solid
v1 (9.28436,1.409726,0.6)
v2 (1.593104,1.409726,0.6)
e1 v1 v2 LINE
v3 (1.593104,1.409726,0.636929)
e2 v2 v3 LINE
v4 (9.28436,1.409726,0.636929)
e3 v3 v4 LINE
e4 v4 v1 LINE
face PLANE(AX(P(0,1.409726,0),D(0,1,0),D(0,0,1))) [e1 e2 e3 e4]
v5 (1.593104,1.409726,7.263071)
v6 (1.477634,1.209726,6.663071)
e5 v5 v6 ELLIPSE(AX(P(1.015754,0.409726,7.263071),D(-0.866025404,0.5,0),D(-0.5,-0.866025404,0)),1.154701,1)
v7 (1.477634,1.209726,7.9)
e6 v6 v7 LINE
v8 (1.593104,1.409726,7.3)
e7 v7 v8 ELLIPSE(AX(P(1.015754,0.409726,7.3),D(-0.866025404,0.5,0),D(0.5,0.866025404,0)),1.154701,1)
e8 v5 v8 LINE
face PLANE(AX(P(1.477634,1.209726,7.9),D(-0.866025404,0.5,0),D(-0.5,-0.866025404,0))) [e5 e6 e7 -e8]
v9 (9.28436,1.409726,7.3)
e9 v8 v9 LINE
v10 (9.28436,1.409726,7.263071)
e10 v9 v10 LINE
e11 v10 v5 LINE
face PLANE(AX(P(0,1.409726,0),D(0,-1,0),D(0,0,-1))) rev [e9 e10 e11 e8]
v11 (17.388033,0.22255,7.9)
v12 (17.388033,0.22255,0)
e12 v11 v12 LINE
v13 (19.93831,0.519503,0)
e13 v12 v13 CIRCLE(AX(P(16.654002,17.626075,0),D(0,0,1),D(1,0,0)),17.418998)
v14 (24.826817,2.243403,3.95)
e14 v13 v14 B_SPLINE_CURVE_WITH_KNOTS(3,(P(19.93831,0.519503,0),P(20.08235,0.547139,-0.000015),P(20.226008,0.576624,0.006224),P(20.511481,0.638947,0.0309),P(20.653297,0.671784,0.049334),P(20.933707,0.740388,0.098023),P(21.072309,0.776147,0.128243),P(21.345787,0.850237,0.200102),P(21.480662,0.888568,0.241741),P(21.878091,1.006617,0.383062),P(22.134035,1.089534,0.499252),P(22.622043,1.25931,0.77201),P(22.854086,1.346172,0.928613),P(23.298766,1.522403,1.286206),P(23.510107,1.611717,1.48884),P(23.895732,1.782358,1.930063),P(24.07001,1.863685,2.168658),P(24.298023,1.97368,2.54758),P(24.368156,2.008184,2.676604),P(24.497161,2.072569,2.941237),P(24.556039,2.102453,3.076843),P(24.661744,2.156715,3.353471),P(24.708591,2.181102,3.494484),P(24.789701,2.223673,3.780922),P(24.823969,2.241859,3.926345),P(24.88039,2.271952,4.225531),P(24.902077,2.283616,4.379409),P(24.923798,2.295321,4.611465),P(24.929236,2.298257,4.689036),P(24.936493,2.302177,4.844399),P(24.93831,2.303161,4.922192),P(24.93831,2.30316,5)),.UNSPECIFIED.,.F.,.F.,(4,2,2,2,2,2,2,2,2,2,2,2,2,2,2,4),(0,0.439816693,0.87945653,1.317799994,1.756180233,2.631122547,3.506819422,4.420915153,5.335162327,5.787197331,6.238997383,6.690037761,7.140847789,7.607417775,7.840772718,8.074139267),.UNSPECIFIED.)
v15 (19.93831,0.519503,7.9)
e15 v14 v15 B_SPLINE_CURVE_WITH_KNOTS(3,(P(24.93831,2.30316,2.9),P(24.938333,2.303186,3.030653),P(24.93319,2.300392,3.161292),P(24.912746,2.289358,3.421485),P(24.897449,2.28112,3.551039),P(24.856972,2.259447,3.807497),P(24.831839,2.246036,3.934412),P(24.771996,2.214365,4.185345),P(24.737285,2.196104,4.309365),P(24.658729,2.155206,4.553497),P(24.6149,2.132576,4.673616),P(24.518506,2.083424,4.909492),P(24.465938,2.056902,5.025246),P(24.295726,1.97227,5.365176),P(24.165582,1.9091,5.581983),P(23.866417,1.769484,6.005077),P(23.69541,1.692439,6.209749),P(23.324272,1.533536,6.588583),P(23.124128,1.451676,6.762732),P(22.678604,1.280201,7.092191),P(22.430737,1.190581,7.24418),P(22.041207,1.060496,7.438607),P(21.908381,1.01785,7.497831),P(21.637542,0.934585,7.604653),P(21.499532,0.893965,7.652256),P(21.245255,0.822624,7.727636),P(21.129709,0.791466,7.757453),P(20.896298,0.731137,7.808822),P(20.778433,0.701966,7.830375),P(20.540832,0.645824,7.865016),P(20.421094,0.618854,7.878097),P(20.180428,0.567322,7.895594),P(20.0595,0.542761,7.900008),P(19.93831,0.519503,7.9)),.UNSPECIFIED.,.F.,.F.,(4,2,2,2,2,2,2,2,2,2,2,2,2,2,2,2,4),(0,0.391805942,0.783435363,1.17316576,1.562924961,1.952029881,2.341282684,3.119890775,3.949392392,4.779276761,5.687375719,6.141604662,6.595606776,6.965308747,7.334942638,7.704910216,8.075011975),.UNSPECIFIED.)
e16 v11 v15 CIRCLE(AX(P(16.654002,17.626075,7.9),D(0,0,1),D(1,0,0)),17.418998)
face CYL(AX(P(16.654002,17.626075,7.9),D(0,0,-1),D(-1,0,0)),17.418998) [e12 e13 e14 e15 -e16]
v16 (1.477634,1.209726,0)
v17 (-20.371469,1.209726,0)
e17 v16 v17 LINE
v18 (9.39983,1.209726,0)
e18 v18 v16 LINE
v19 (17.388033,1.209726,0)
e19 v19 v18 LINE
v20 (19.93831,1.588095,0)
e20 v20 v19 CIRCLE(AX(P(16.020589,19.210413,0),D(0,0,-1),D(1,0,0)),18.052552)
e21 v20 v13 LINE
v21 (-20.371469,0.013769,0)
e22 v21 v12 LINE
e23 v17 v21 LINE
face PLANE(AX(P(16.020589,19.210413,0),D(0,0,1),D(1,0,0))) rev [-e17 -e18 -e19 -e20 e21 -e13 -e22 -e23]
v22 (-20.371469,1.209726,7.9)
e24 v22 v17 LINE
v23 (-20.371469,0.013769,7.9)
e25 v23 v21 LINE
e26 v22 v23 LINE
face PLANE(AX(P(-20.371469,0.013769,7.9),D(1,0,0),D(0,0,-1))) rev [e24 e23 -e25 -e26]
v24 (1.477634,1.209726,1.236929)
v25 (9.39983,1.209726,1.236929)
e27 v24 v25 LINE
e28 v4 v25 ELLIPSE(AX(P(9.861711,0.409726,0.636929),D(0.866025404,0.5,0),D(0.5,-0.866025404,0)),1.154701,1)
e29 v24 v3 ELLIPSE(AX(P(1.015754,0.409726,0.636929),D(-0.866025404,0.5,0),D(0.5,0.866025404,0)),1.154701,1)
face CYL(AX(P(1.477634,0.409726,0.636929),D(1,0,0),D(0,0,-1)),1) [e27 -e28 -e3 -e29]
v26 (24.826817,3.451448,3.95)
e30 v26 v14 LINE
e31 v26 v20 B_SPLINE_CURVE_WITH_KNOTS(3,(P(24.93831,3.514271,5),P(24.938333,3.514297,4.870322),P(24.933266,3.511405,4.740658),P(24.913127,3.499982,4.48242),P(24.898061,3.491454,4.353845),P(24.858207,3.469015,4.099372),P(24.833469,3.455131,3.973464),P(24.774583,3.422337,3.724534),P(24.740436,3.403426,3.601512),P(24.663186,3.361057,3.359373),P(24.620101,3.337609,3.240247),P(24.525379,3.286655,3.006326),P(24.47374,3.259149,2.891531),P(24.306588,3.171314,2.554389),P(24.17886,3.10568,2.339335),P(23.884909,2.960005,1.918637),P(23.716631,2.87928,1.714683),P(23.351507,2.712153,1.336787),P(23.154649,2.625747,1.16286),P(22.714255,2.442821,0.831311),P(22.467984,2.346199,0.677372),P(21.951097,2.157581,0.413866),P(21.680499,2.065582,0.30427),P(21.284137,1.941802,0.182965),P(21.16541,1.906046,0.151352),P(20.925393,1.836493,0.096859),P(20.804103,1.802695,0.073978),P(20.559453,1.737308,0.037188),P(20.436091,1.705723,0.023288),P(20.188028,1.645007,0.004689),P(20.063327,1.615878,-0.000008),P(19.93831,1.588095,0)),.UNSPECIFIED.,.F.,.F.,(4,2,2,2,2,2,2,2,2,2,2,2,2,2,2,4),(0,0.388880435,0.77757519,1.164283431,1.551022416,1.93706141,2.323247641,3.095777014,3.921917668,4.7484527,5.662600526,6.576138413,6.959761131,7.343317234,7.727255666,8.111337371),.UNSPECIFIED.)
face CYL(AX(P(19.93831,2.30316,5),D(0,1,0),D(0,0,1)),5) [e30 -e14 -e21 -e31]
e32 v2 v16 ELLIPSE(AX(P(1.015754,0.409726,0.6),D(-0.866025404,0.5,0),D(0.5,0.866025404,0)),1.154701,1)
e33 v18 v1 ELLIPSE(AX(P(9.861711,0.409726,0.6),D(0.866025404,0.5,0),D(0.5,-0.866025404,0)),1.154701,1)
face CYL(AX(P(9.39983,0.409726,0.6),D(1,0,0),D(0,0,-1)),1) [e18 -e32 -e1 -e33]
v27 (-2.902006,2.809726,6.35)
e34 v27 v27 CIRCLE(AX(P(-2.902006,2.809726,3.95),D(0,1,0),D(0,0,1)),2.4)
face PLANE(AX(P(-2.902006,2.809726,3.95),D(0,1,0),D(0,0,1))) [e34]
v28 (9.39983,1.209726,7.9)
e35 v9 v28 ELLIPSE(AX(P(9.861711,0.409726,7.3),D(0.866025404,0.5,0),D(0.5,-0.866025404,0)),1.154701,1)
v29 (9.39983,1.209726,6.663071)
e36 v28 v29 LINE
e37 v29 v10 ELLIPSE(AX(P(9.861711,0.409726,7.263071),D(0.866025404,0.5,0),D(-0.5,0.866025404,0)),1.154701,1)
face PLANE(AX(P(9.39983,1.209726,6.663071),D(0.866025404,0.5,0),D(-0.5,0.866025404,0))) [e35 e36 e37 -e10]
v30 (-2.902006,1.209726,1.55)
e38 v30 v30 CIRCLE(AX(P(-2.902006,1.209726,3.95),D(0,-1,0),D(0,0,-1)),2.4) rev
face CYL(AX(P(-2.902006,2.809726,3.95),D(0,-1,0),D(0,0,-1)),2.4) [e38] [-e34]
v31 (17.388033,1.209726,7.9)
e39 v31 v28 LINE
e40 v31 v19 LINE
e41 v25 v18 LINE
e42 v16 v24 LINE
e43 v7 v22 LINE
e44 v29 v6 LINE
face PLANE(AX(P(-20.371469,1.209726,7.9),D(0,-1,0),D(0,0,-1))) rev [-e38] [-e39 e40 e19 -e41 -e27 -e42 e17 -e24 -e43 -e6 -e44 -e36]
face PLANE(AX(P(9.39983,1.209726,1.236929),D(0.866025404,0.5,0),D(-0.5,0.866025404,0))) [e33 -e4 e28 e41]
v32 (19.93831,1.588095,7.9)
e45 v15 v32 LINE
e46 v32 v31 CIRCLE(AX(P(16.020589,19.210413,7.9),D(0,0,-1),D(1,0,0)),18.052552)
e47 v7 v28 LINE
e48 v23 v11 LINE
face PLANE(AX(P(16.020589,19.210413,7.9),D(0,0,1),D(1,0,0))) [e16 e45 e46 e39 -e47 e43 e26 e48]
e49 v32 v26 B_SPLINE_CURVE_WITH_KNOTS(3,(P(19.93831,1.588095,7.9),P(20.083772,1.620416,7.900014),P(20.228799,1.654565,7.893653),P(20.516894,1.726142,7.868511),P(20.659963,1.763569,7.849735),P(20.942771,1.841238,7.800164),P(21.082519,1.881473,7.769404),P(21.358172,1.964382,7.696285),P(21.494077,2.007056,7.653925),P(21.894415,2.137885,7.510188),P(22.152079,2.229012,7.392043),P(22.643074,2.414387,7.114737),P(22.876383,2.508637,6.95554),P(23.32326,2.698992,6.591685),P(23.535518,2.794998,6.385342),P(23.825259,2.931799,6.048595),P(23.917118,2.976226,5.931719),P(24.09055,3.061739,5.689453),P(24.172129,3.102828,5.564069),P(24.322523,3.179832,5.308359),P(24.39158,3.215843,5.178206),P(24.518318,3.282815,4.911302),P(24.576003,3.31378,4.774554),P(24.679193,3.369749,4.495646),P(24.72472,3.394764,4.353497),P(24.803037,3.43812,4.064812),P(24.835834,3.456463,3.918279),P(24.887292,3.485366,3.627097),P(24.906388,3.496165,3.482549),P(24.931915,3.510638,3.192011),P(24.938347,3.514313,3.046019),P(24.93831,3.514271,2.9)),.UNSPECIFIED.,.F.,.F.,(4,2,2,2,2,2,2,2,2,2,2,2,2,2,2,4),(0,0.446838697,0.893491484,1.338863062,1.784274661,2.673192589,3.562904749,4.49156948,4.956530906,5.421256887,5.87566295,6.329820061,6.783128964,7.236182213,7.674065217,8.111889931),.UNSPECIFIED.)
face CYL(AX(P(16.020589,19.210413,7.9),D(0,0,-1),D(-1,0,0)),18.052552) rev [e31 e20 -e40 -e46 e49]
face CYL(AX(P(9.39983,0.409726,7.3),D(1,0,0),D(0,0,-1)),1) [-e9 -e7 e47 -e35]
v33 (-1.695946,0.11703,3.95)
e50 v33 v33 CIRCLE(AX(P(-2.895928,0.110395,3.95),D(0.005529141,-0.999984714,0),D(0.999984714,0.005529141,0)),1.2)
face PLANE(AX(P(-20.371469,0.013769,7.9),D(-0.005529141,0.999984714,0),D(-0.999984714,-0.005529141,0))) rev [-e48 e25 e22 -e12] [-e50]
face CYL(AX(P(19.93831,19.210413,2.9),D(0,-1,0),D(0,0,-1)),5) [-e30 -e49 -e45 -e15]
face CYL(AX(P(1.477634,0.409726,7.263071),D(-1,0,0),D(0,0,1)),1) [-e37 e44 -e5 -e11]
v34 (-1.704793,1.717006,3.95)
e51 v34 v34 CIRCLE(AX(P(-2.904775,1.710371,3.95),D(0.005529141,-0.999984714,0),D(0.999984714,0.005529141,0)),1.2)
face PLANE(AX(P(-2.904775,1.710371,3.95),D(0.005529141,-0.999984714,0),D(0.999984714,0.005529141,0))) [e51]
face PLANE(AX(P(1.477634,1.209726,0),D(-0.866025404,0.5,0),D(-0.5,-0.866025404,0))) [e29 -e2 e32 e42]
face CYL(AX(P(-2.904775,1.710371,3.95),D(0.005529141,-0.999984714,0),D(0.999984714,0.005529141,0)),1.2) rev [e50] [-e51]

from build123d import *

# Parameters (mm, degrees)
SKATEBOARDBASE_DEPTH         = 7.9
CURVEDFRONT_R                = 5
SKETCH2_R                    = 2.4
STUD_DEPTH                   = 1.6
SKETCH3_W                    = 7.922196178
SKETCH3_H                    = 1.23692935
UPPERNOTCHES_DEPTH           = 0.2
UPPERNOTCHES_DRAFT           = 30
UPPERNOTCHES_PROFILE_2_DEPTH = 0.2
UPPERNOTCHES_PROFILE_2_DRAFT = 30
NOTCHFILLET_R                = 1
SKETCH4_R                    = 1.2
UNDERSTUDHOLE_DEPTH          = 1.6


with BuildPart() as part:
    # Sketch1 → SkateBoardBase (new body)
    with BuildSketch(Plane.XY):
        with BuildLine():
            Line((-20.371469293, 0.013768995), (17.388032716, 0.222549812))
            ThreePointArc((17.388032716, 0.222549812), (21.281619196, 0.833021385), (24.938309637, 2.303159558))
            Line((24.938309637, 2.303159558), (24.938309637, 3.514270646))
            ThreePointArc((24.938309637, 3.514270646), (21.290682244, 1.944239503), (17.388032716, 1.209726022))
            Line((17.388032716, 1.209726022), (-20.371469293, 1.209726022))
            Line((-20.371469293, 1.209726022), (-20.371469293, 0.013768995))
        make_face()
    extrude(amount=SKATEBOARDBASE_DEPTH)

    # CurvedFront
    # the kernel refuses this fillet: 5 mm, written as the material it takes off along each edge
    with BuildSketch(Plane(origin=(24.938309637, -10.196840442, 0), x_dir=(0, 0, 1), z_dir=(0, 1, 0))) as curvedfront_piece_1:
        with BuildLine():
            CenterArc((CURVEDFRONT_R, -CURVEDFRONT_R), CURVEDFRONT_R, 90, 90)
            Line((0, -CURVEDFRONT_R), (0, 0))
            Line((0, 0), (CURVEDFRONT_R, 0))
        make_face()
    extrude(amount=26.211111088, mode=Mode.SUBTRACT)
    with BuildSketch(Plane(origin=(24.938309637, -10.196840442, 7.9), x_dir=(0, 0, -1), z_dir=(0, 1, 0))) as curvedfront_piece_2:
        with BuildLine():
            CenterArc((CURVEDFRONT_R, CURVEDFRONT_R), CURVEDFRONT_R, 180, 90)
            Line((0, CURVEDFRONT_R), (0, 0))
            Line((0, 0), (CURVEDFRONT_R, 0))
        make_face()
    extrude(amount=26.211111088, mode=Mode.SUBTRACT)

    # Sketch2 → Stud (add)
    with BuildSketch(Plane(origin=(0, 1.209726022, 0), x_dir=(1, 0, 0), z_dir=(0, 1, 0))):
        with Locations(Location((-2.902006395, -3.95, 0), (0, 0, 90))):
            Circle(SKETCH2_R)
    extrude(amount=STUD_DEPTH)


with BuildPart() as uppernotches_tool:
    # Sketch3 → UpperNotches (with draft: the straight prism first)
    with BuildSketch(Plane(origin=(0, 1.209726022, 0), x_dir=(1, 0, 0), z_dir=(0, 1, 0))):
        with Locations((5.4387323, -0.618464675)):
            Rectangle(SKETCH3_W, SKETCH3_H)
    extrude(amount=UPPERNOTCHES_DEPTH)
    # UpperNotches: the draft: its side faces are tilted about the plane it starts from
    uppernotches_sides = [uppernotches_tool.faces().sort_by_distance(p)[0] for p in [
        (1.477634211, 1.309726022, 0.618464675),
        (5.4387323, 1.309726022, 1.23692935),
        (9.399830389, 1.309726022, 0.618464675),
        (5.4387323, 1.309726022, 0),
    ]]
    draft(uppernotches_sides, Plane(origin=(0, 1.209726022, 0), x_dir=(1, 0, 0), z_dir=(0, 1, 0)), UPPERNOTCHES_DRAFT)


with BuildPart() as part_1:
    add(part.part)

    # UpperNotches: add uppernotches_tool
    add(uppernotches_tool.part)


with BuildPart() as uppernotches_profile_2_tool:
    # Sketch3 → UpperNotches profile 2 (with draft: the straight prism first)
    with BuildSketch(Plane(origin=(0, 1.209726022, 0), x_dir=(1, 0, 0), z_dir=(0, 1, 0))):
        with Locations((5.4387323, -7.281535325)):
            Rectangle(SKETCH3_W, SKETCH3_H)
    extrude(amount=UPPERNOTCHES_PROFILE_2_DEPTH)
    # UpperNotches profile 2: the draft: its side faces are tilted about the plane it starts from
    uppernotches_profile_2_sides = [uppernotches_profile_2_tool.faces().sort_by_distance(p)[0] for p in [
        (5.4387323, 1.309726022, 6.66307065),
        (1.477634211, 1.309726022, 7.281535325),
        (5.4387323, 1.309726022, 7.9),
        (9.399830389, 1.309726022, 7.281535325),
    ]]
    draft(uppernotches_profile_2_sides, Plane(origin=(0, 1.209726022, 0), x_dir=(1, 0, 0), z_dir=(0, 1, 0)), UPPERNOTCHES_PROFILE_2_DRAFT)


with BuildPart() as part_2:
    add(part_1.part)

    # UpperNotches profile 2: add uppernotches_profile_2_tool
    add(uppernotches_profile_2_tool.part)

    # NotchFillet
    # the kernel refuses this fillet: 1 mm, written as the material it takes off along each edge
    with BuildSketch(Plane(origin=(0.381779399, 1.409726022, 1.121459296), x_dir=(0, -0.8660254037844376, 0.5000000000000017), z_dir=(1, 0, 0)), Plane(origin=(10.4956852, 1.409726022, 0.115470054), x_dir=(0, -0.8660254037844383, -0.5000000000000008), z_dir=(-1, 0, 0)), Plane(origin=(0.381779399, 1.409726022, 7.784529946), x_dir=(0, -0.8660254037844378, 0.5000000000000013), z_dir=(1, 0, 0)), Plane(origin=(10.4956852, 1.409726022, 6.778540704), x_dir=(0, -0.8660254037844378, -0.5000000000000013), z_dir=(-1, 0, 0))) as notchfillet_piece_1:
        with BuildLine():
            CenterArc((0.623760431, 0.919615242), NOTCHFILLET_R, 210, 36.869897646)
            Line((-0.242264973, 0.419615242), (-0.259585481, 0.409615242))
            Line((-0.259585481, 0.409615242), (-0.017320508, -0.01))
            Line((-0.017320508, -0.01), (0, -0.02))
            ThreePointArc((0, -0.02), (0.115470054, -0.02), (0.223083701, -0.018392305))
            Line((0.223083701, -0.018392305), (0.230940108, 0))
        make_face()
    extrude(amount=10.113905801, mode=Mode.SUBTRACT)

    # Sketch4 → UnderStudHole (cut)
    with BuildSketch(Plane(origin=(-0.000698914, 0.126403586, 0), x_dir=(-0.9999847141809186, -0.005529141389625959, 0), z_dir=(0.005529141389625959, -0.9999847141809186, 0))):
        with Locations(Location((2.895273289, -3.95, 0), (0, 0, 180))):
            Circle(SKETCH4_R)
    extrude(amount=-UNDERSTUDHOLE_DEPTH, mode=Mode.SUBTRACT)


solid = part_2.part
